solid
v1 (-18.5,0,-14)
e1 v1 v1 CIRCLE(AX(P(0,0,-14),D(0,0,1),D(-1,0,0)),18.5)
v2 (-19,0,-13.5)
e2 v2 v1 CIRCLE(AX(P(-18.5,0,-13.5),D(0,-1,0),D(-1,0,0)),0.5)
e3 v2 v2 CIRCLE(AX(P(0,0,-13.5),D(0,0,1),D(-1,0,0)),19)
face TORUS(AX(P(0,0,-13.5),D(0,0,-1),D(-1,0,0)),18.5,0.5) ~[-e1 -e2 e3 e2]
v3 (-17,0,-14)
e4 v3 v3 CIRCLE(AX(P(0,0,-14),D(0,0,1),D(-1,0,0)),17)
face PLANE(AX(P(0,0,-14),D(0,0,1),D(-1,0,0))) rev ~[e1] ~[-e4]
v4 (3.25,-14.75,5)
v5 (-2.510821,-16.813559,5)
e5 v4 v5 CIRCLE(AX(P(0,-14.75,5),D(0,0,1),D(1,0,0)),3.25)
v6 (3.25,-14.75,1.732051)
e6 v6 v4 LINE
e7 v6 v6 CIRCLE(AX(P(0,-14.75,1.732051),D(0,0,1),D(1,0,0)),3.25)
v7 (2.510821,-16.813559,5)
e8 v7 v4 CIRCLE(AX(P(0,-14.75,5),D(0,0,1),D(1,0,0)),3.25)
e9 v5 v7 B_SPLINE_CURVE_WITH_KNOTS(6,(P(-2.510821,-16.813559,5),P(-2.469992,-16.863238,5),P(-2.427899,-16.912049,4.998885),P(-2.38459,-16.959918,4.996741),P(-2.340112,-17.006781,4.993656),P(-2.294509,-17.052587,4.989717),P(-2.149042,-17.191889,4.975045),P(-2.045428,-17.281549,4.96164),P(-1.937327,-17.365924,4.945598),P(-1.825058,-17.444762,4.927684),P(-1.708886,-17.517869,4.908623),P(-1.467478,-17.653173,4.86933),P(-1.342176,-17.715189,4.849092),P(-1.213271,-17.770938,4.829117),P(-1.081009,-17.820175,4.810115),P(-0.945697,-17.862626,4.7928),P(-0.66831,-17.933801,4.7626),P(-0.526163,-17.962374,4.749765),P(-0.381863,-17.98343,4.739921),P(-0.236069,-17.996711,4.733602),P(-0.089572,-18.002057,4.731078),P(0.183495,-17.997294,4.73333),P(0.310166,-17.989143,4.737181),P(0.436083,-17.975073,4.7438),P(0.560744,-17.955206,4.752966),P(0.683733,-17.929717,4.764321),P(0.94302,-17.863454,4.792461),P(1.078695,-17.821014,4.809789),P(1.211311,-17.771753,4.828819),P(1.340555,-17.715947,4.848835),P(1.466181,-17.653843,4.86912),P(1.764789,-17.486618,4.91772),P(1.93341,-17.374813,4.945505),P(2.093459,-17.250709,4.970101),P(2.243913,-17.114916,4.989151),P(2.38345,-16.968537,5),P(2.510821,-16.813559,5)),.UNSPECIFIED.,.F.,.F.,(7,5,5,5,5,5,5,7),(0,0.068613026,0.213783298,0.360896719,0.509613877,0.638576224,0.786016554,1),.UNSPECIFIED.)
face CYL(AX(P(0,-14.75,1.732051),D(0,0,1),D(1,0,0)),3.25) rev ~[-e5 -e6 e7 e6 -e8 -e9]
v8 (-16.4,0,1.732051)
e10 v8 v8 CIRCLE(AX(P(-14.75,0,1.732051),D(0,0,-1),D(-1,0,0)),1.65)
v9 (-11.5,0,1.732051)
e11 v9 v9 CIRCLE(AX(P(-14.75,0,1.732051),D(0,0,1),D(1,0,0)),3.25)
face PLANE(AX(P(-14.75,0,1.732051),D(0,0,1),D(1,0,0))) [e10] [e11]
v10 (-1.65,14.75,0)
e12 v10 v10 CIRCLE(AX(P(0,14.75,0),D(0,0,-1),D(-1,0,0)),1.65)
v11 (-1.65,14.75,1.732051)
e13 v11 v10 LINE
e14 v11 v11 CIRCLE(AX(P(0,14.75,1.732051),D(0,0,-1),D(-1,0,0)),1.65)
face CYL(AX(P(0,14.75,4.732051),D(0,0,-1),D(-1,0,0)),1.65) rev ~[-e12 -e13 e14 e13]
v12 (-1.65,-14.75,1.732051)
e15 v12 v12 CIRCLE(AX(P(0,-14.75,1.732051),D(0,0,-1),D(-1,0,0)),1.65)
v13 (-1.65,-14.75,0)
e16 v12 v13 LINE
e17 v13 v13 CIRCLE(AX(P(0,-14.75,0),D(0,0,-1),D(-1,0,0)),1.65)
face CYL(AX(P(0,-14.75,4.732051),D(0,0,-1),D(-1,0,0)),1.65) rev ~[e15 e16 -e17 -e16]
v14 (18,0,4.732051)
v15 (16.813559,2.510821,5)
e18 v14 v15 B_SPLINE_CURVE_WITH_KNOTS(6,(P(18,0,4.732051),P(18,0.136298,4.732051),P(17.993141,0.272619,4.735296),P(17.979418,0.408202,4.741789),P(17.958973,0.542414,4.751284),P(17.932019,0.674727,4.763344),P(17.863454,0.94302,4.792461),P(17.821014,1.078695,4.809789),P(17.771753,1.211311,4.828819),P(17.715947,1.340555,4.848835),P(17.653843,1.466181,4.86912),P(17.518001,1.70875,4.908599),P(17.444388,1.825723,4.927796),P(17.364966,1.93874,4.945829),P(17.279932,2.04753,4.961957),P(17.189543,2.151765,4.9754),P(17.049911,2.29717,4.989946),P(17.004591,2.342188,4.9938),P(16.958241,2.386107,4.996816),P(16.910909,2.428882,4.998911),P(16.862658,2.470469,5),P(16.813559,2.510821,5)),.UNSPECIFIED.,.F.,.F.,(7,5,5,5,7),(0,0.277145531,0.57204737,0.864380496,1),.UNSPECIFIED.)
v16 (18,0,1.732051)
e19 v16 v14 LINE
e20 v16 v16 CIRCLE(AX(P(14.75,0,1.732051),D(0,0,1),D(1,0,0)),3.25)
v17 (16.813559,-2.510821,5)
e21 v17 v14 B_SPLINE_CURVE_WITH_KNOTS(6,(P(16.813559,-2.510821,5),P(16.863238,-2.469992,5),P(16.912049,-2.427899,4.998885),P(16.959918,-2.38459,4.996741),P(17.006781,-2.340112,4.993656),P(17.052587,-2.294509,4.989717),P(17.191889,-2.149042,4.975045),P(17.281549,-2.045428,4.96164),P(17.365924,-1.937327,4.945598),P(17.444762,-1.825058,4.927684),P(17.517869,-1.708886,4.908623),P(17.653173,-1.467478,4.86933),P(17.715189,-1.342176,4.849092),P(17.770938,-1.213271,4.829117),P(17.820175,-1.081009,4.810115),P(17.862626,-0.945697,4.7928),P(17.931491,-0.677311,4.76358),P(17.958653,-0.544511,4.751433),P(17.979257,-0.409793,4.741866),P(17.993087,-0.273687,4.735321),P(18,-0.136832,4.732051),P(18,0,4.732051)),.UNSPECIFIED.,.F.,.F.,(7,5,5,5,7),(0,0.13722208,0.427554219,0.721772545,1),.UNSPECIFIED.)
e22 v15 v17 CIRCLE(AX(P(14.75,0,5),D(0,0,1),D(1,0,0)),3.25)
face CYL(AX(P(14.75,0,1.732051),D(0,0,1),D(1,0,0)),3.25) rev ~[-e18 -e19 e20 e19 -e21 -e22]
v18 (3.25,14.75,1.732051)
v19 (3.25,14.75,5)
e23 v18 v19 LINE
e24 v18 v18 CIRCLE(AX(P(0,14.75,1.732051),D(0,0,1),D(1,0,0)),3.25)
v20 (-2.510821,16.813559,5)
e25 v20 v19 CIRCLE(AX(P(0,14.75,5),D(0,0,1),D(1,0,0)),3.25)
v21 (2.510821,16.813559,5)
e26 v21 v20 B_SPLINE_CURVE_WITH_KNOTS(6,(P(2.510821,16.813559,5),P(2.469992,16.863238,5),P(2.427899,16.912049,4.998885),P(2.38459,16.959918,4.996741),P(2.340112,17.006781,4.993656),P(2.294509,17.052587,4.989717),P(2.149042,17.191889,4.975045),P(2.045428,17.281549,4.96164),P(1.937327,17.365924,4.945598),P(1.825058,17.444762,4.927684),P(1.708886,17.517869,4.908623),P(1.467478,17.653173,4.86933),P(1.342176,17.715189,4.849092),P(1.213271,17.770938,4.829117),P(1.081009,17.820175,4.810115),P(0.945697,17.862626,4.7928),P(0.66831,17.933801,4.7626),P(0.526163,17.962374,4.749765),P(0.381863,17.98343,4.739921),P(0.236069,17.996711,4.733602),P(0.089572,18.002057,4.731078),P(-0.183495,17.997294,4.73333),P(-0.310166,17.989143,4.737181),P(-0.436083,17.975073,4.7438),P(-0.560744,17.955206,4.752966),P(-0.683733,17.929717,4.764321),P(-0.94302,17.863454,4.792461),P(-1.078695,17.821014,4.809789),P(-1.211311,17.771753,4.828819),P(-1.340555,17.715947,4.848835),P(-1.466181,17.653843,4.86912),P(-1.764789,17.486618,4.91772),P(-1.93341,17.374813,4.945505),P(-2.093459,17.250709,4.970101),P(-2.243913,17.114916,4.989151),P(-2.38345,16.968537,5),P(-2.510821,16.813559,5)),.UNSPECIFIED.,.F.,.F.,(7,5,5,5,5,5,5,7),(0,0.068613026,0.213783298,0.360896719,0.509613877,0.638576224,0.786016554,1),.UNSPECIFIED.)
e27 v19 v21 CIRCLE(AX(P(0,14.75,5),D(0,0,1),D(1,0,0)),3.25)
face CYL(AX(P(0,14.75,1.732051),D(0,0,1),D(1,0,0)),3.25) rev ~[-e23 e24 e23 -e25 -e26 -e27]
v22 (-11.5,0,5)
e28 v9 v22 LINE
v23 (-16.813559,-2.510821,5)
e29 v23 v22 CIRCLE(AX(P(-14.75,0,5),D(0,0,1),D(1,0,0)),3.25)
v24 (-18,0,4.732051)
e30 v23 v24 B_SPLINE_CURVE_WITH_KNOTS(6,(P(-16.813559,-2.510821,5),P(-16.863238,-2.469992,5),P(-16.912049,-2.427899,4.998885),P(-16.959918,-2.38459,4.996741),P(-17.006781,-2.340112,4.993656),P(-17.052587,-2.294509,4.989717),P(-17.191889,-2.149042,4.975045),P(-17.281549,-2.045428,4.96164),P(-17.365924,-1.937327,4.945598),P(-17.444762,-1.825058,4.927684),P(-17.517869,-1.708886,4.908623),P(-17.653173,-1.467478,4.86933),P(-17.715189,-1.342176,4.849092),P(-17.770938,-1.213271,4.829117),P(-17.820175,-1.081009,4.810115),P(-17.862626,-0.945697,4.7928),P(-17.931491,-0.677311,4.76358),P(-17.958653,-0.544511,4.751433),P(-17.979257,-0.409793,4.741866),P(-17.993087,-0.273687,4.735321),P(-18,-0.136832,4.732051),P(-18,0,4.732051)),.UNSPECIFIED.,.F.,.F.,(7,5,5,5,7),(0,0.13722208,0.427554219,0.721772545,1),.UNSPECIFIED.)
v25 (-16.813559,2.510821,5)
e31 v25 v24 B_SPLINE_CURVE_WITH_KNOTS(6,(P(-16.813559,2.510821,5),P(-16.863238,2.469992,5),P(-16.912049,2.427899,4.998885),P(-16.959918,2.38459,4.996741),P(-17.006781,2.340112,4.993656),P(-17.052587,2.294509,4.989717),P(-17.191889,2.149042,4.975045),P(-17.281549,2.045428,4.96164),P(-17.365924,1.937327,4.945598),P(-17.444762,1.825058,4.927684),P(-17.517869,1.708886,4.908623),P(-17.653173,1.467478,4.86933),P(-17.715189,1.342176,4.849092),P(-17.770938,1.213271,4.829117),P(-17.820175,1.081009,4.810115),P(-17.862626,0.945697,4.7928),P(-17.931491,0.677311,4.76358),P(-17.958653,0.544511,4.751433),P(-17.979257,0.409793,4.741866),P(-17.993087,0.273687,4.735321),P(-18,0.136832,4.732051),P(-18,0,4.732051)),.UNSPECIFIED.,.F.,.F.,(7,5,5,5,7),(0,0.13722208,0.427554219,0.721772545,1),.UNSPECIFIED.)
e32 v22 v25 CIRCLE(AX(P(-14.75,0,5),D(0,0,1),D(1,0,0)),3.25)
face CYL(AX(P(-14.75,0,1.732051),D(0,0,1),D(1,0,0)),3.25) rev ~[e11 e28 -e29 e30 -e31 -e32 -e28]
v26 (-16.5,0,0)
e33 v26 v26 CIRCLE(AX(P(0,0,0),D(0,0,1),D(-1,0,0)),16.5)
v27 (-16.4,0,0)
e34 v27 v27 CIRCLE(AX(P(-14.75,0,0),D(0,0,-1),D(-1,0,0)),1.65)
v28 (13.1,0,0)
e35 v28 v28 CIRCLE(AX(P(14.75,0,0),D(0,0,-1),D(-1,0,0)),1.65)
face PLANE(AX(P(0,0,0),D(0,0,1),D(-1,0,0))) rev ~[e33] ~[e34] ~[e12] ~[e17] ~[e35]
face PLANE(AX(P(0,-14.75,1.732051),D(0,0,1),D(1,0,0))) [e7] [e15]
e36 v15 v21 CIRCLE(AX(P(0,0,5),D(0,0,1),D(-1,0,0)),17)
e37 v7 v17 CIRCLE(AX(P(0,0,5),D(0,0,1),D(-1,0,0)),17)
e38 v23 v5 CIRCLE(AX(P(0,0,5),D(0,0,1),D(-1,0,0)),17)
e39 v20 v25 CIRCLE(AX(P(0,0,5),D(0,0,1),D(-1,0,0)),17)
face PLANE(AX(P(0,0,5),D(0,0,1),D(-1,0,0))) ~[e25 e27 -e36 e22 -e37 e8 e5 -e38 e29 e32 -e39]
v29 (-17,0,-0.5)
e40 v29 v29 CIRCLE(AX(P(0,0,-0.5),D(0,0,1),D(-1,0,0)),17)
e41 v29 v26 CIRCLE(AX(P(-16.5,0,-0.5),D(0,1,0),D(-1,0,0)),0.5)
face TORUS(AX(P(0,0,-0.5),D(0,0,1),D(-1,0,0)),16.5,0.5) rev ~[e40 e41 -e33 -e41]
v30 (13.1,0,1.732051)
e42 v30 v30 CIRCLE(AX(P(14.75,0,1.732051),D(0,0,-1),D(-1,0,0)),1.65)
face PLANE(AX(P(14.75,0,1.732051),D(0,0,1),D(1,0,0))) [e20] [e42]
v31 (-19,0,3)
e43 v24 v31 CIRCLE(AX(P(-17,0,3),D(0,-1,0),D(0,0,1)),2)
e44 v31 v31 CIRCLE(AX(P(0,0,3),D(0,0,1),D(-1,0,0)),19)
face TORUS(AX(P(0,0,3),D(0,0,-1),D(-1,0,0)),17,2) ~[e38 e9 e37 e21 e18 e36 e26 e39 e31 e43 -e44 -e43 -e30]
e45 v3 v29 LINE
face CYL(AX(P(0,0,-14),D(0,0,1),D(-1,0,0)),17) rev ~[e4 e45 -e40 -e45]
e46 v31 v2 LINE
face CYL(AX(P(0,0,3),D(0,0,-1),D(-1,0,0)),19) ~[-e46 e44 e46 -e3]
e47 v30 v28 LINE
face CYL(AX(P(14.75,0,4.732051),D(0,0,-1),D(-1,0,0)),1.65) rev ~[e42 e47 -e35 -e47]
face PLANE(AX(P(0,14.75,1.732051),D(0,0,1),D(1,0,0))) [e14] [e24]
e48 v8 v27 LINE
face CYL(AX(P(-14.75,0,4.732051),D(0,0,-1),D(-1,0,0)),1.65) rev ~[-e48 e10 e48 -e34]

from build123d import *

# Parameters (mm, degrees)
F3_D           = 3.3
F3_DEPTH       = 8
F3_START       = 0.2679493
F3_CBORE_D     = 6.5
F3_CBORE_DEPTH = 3
F3_TIP         = 0.9914200214


with BuildPart() as f1:
    # F0 (on Front) → F1 (revolve)
    with BuildSketch(Plane.XZ):
        with BuildLine():
            Line((-16.5, 0), (0, 0))
            Line((0, 0), (0, 5))
            Line((0, 5), (-17, 5))
            ThreePointArc((-17, 5), (-18.4142135624, 4.4142135624), (-19, 3))
            Line((-19, 3), (-19, -13.5))
            ThreePointArc((-19, -13.5), (-18.8535533906, -13.8535533906), (-18.5, -14))
            Line((-18.5, -14), (-17, -14))
            Line((-17, -14), (-17, -0.5))
            ThreePointArc((-17, -0.5), (-16.8535533906, -0.1464466094), (-16.5, 0))
        make_face()
    revolve(axis=Axis((0, 0, 2.5), (0, 0, 1)))

    # F3
    # its depths count from where the whole tool has entered the part; down to there all is cleared
    with Locations(Plane.XY.offset(5).offset(-F3_START)):
        with Locations((0, 14.75), (14.75, 0), (0, -14.75), (-14.75, 0)):
            CounterBoreHole(F3_D / 2, F3_CBORE_D / 2, F3_CBORE_DEPTH, depth=F3_DEPTH)
            with Locations((0, 0, -(F3_DEPTH + F3_TIP / 2))):  # 118° drill point
                Cone(0, F3_D / 2, F3_TIP, mode=Mode.SUBTRACT)


solid = f1.part
